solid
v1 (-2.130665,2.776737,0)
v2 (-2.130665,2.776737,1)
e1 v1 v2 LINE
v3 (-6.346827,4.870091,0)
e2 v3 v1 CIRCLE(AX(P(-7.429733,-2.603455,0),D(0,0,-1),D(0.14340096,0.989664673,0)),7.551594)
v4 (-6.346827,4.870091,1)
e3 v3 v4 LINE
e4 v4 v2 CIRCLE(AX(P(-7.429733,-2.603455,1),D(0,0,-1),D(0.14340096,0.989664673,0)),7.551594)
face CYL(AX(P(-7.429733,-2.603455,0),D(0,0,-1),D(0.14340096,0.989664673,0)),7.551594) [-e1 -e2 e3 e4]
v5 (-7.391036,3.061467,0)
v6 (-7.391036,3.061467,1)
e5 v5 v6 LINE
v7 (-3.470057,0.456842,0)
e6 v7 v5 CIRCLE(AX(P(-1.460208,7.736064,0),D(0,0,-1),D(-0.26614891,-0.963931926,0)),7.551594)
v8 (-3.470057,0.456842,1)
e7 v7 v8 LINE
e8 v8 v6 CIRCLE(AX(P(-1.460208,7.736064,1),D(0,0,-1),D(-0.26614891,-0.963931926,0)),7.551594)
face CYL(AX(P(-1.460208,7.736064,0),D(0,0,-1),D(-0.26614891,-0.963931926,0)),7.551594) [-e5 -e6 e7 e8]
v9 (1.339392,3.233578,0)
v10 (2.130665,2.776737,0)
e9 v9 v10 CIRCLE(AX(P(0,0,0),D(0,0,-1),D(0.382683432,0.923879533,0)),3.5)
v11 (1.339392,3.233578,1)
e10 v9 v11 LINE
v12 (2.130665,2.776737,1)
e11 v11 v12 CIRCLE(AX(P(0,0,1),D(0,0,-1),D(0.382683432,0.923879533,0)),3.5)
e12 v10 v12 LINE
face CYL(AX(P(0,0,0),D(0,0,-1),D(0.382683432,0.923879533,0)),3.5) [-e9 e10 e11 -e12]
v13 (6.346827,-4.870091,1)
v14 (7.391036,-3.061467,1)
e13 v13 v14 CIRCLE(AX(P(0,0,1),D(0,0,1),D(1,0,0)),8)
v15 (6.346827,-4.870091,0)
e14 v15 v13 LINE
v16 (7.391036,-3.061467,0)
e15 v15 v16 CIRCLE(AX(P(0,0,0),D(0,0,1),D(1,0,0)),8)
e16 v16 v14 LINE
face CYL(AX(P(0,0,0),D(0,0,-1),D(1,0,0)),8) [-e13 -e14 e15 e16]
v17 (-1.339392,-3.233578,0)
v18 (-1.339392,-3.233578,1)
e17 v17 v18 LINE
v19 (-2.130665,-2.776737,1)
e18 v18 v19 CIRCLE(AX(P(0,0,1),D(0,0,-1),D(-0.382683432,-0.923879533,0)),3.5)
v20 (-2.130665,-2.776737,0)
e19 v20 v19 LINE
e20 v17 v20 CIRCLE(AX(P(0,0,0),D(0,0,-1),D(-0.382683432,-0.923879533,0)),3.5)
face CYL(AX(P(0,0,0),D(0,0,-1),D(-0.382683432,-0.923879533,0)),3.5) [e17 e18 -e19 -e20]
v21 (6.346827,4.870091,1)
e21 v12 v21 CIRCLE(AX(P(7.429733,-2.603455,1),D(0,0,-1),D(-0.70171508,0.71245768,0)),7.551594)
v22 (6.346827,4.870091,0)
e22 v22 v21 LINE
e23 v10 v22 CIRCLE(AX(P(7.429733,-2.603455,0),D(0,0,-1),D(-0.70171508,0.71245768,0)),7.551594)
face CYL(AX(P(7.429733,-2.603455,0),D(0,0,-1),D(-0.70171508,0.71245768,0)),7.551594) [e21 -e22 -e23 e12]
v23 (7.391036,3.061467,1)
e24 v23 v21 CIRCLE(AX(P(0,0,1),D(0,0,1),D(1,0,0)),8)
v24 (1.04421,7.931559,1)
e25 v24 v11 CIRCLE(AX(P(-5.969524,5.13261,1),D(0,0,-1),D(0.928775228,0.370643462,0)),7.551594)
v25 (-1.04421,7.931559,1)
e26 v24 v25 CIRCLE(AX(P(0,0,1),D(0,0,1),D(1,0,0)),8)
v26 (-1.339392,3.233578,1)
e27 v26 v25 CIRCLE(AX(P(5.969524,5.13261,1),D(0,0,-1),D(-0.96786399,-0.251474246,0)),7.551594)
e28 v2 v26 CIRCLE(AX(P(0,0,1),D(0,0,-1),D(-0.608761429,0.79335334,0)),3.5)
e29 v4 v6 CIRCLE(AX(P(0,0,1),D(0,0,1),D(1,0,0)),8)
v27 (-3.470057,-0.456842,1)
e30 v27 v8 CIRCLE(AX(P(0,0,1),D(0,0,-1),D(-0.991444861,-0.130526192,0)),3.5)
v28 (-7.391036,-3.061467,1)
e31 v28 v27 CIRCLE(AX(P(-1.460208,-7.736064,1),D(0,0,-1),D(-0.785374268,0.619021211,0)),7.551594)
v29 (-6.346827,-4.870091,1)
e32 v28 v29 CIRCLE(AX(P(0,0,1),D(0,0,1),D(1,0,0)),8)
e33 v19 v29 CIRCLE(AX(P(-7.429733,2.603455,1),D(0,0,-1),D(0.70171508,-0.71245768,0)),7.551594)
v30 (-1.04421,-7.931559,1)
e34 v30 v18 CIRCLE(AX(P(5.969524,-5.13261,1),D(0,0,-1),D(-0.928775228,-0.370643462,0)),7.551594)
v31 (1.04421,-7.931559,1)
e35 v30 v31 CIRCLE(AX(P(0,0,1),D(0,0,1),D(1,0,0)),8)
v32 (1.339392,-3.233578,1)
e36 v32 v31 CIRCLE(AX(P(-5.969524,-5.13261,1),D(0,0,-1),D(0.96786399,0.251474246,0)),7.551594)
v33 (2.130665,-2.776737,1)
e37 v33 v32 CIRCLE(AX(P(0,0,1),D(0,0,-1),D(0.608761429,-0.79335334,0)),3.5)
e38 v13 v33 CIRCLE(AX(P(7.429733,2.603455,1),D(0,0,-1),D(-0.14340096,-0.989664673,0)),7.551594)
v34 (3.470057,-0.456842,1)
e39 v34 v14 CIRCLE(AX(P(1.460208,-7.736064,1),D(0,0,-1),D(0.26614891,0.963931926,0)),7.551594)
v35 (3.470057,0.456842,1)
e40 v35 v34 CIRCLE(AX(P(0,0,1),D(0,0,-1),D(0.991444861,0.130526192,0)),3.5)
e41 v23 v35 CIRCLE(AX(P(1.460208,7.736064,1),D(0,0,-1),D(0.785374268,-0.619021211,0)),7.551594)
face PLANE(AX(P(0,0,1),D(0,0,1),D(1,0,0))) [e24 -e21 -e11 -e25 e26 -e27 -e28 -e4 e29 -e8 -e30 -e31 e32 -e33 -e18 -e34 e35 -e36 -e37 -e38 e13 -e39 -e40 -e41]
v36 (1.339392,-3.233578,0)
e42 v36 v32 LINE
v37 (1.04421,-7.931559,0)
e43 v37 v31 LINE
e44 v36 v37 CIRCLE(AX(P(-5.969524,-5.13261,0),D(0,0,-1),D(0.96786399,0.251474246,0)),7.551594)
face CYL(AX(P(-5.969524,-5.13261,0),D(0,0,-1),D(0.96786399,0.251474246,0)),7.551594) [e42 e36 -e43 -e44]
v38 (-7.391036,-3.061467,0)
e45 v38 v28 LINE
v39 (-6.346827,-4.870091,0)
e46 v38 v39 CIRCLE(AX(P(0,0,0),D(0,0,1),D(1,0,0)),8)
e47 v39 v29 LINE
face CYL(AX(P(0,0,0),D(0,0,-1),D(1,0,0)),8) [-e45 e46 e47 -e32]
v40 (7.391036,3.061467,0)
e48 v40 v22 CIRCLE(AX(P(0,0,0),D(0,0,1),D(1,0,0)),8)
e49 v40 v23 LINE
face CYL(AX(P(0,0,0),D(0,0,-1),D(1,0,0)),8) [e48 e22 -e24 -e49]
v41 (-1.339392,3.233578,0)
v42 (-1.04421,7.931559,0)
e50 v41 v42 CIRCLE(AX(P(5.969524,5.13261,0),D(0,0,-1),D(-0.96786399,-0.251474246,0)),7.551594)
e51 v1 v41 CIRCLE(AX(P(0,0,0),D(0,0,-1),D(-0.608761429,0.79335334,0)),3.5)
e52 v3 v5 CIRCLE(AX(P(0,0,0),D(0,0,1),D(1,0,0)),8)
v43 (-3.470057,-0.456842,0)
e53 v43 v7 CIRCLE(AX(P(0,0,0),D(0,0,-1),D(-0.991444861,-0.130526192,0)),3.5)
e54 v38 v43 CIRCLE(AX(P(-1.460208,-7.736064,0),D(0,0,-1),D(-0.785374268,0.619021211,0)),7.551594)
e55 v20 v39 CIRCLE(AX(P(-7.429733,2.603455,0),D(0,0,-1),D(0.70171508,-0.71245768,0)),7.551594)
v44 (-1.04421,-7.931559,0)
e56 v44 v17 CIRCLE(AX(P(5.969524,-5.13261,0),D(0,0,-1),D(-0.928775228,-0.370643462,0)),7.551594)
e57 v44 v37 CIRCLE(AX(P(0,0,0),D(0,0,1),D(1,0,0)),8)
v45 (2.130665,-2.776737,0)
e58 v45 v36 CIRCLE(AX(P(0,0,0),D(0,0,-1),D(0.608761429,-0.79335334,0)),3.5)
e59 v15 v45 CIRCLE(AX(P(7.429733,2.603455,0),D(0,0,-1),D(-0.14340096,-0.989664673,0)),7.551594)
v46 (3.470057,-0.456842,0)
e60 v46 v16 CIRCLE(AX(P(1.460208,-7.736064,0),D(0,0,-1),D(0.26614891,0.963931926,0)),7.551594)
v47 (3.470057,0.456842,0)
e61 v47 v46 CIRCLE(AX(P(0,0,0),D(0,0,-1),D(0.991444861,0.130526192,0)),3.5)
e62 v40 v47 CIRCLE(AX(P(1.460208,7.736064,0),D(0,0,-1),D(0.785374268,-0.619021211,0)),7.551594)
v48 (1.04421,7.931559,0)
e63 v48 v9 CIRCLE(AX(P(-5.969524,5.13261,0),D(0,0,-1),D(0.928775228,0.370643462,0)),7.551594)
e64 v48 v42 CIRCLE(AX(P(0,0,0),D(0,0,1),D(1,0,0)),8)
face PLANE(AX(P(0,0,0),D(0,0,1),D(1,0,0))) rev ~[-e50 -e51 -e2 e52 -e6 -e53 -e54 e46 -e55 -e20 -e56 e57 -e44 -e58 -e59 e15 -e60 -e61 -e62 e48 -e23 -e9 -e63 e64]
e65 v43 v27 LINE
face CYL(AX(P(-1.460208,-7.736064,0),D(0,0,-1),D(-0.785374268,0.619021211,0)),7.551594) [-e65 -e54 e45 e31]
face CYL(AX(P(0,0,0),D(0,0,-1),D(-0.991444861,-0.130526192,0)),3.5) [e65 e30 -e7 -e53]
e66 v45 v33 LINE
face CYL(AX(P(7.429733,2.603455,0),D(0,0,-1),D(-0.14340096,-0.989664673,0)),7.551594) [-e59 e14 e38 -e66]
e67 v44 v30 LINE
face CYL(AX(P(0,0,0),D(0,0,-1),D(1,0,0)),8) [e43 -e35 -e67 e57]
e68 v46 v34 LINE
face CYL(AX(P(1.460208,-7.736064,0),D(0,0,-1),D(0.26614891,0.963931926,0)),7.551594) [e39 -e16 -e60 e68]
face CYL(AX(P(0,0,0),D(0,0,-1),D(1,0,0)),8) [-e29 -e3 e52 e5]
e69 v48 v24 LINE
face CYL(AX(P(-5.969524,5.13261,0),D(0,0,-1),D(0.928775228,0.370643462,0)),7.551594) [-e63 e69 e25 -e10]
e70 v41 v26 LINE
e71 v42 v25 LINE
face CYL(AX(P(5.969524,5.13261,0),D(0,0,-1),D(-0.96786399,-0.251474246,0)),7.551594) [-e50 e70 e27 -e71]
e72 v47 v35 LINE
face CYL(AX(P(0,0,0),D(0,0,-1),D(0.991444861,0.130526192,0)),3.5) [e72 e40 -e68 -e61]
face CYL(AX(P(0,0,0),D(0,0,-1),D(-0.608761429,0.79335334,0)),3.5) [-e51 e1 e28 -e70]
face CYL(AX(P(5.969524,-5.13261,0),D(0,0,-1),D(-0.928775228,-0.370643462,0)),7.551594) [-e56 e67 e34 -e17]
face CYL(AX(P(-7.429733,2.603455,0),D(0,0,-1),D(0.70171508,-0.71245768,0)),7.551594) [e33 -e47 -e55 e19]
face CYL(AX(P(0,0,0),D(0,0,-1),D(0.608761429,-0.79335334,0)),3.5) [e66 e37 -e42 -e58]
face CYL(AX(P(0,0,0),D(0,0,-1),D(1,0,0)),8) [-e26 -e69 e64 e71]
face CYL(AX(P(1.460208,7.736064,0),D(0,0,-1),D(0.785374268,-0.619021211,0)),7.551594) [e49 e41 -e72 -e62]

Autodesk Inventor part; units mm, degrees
sketch "Sketch1" plane through (0, 0, 0) normal (0, 0, 1) x (1, 0, 0)
  circle A0 centre (0, 0) radius 8
  dimension "d0" = 16
extrude "Extrusion1" add sketch "Sketch1" along normal blind 1
ref_plane "Work Plane2" through (0, 0, 0.5) normal (0, 0, 1) x (1, 0, 0)
sketch "Sketch2" plane through (0, 0, 0) normal (0, 0, -1) x (-1, 0, 0)
  circle A0 centre (0, 0) radius 8 projected
  circle A1 centre (0, 0) radius 6
  dimension "d3" = 12
surface extrude "Średnica podziałowa" sketch "Sketch2" against normal through all shown no curves A1
ref_plane "Work Plane8" through (0, 0, 0) normal (0.8660254, 0.5, 0) x (0, 0, 1)
ref_plane "Work Plane9" through (0, 0, 0) normal (1, 0, 0) x (0, 1, 0)
spur gear teeth "Przekładnia walcowa" teeth 6 pitch diameter 12 tip diameter 16 root diameter 7 face width 1 start plane through (0, 0, 0) normal (0, 0, -1) x (-1, 0, 0)
equation "\"d0\" = da_da"
equation "\"d1\" = da_b"
equation "\"d3\" = da_dw"
equation "\"d16\" = da_aw"
equation "\"d43\" = da_aw"
equation "\"d46\" = da_aw"
equation "\"da_da\" = 16"
equation "\"da_b\" = 1"
equation "\"da_dw\" = 12"
equation "\"da_aw\" = 21"
properties part number "Przekładnia walcowa1" material "Steel"
